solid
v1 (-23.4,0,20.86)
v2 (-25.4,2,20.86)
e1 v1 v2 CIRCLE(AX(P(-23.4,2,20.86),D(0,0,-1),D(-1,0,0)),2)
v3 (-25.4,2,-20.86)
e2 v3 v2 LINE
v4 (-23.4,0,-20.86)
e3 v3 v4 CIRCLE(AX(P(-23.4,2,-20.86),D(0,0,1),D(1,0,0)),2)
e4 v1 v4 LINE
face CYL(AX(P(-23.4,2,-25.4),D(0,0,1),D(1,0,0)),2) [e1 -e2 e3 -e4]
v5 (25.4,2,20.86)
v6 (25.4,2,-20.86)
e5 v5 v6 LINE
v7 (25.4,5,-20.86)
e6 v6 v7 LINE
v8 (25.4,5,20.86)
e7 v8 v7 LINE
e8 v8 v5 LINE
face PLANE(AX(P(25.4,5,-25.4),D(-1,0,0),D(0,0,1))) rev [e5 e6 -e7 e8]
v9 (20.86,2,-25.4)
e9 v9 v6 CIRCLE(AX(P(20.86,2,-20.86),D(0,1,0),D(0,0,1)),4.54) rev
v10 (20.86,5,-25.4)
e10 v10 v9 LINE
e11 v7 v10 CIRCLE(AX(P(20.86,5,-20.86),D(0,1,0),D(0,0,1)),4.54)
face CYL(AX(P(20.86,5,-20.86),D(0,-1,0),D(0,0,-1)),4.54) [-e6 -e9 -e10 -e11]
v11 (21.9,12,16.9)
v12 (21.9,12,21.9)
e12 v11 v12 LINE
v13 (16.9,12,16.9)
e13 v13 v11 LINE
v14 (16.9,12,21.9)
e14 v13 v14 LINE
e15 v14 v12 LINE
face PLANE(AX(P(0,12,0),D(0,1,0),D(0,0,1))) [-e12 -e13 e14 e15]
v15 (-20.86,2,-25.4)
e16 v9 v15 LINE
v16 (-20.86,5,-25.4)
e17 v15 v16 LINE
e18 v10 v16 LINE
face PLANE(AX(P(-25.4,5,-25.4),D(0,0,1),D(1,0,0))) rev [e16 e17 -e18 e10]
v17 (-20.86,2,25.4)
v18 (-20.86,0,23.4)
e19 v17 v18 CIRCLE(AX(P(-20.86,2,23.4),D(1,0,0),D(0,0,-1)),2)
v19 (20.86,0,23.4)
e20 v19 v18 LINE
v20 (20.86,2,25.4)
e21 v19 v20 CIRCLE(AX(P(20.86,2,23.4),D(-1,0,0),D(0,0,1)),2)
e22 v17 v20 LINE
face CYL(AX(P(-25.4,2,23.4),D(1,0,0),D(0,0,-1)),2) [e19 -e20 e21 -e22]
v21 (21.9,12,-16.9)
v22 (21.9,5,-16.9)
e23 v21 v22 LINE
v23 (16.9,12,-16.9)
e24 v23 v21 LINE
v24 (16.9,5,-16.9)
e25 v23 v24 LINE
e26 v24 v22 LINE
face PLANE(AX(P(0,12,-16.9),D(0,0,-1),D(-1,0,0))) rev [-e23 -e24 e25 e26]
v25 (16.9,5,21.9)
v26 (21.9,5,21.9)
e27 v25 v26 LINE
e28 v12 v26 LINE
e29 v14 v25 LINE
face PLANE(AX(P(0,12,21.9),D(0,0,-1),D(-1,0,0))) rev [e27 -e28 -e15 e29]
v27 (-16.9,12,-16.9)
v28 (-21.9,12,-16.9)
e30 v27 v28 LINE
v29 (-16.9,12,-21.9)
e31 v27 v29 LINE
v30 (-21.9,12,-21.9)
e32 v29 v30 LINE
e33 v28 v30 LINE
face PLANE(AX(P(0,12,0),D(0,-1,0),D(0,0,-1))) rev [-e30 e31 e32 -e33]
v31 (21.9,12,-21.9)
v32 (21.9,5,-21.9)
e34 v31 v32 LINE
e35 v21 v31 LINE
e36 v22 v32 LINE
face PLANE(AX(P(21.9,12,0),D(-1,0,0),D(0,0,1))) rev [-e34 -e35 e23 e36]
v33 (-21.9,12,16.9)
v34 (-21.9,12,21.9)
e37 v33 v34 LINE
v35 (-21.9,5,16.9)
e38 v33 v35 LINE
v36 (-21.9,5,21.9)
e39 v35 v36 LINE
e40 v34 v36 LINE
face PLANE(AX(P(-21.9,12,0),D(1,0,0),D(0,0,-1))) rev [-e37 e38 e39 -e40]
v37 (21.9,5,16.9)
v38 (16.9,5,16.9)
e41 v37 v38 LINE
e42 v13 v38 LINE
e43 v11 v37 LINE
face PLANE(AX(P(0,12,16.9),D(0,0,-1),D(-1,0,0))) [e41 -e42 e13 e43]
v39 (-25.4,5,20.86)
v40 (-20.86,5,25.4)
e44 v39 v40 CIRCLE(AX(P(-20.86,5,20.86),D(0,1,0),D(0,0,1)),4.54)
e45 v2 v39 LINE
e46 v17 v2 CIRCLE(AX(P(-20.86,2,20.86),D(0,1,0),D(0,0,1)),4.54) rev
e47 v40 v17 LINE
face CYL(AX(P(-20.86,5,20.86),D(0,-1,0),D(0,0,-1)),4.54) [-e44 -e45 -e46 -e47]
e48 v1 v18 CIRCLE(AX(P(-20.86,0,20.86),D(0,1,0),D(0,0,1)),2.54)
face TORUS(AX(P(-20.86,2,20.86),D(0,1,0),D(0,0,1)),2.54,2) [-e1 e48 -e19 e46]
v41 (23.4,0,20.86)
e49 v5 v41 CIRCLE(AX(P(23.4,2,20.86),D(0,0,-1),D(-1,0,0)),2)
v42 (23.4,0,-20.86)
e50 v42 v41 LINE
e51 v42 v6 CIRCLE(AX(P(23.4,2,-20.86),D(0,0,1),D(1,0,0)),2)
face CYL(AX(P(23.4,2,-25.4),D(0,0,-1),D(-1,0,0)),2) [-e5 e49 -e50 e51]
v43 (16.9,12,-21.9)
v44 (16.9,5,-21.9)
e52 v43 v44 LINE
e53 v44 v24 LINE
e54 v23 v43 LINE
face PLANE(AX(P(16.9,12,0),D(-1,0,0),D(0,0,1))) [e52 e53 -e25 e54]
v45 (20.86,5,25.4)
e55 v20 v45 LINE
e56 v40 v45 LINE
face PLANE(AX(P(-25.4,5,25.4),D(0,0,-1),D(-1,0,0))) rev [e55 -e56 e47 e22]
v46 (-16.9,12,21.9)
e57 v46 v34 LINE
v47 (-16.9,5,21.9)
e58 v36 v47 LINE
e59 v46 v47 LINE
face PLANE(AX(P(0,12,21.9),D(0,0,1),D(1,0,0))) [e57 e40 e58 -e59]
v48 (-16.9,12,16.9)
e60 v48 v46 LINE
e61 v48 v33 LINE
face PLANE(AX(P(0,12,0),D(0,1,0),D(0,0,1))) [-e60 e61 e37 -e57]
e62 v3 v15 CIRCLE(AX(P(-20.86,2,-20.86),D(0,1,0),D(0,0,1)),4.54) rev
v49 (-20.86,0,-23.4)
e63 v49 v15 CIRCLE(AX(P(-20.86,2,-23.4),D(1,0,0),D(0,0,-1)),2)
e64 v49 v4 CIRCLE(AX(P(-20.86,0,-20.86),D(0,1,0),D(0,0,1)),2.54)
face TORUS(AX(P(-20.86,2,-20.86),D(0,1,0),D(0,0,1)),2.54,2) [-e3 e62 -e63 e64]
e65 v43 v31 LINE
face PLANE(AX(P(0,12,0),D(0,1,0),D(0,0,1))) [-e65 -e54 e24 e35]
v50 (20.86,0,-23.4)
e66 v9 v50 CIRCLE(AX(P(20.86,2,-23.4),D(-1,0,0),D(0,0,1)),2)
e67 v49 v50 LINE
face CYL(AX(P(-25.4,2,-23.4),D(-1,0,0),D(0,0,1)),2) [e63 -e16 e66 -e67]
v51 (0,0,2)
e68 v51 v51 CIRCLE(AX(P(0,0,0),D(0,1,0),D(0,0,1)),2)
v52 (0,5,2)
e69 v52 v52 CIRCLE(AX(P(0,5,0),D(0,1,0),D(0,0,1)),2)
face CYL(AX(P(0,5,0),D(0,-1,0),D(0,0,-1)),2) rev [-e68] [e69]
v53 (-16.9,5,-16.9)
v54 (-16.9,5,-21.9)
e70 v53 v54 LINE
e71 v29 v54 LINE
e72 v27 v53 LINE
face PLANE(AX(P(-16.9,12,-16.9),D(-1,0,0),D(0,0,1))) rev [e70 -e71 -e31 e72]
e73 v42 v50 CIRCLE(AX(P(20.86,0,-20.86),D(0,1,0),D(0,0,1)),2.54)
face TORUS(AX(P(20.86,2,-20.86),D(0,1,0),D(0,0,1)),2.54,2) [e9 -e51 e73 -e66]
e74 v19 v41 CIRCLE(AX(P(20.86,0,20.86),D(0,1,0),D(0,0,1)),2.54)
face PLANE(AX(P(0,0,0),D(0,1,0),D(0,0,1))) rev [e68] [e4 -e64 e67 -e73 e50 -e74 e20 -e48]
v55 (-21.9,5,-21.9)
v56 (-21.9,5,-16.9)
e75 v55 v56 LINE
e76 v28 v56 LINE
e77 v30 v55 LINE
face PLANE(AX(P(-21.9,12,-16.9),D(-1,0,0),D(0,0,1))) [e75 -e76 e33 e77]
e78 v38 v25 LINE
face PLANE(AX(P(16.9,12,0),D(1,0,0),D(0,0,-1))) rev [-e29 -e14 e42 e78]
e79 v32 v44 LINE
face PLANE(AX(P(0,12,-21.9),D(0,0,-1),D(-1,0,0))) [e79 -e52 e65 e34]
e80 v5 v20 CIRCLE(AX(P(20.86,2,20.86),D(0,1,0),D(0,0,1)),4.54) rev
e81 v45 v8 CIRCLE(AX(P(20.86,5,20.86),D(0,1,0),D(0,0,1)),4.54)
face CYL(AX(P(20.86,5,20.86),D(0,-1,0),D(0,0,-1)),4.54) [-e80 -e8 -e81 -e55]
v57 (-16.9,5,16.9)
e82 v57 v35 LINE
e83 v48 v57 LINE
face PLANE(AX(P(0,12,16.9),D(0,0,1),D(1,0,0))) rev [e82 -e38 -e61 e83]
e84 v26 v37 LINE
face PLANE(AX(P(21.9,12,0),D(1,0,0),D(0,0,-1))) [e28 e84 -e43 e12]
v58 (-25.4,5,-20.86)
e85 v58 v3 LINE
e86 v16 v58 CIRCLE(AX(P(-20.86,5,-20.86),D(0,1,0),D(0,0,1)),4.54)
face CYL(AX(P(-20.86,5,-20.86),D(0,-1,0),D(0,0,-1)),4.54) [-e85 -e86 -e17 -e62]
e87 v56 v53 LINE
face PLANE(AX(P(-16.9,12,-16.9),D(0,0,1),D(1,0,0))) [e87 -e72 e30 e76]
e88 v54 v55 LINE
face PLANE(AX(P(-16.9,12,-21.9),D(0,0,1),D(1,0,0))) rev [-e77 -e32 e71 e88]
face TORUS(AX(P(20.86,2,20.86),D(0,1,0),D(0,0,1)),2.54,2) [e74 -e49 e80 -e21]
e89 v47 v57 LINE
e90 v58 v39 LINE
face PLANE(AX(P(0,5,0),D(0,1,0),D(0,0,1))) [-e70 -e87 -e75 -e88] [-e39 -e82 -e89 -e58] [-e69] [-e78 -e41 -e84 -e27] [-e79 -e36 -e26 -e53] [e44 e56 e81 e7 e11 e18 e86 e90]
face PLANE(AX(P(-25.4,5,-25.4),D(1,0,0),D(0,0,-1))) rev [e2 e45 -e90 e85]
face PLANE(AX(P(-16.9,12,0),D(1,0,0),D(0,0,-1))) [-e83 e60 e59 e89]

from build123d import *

# Parameters (mm, degrees)
SKETCH1_W           = 50.8
SKETCH1_H           = 50.8
SKETCH1_R           = 2
SKETCH1_W_2         = 5
SKETCH1_H_2         = 5
BOSS_EXTRUDE1_DEPTH = 5
FILLET1_R           = 2
FILLET2_R           = 4.54
SKETCH1_6_W         = 5
SKETCH1_6_H         = 5
BOSS_EXTRUDE2_DEPTH = 12


with BuildPart() as part:
    # Sketch1 → Boss-Extrude1 (new body)
    with BuildSketch(Plane(origin=(0, 0, 0), x_dir=(1, 0, 0), z_dir=(0, 1, 0))):
        Rectangle(SKETCH1_W, SKETCH1_H)
        with Locations(Location((0, 0, 0), (0, 0, 270))):
            Circle(SKETCH1_R, mode=Mode.SUBTRACT)
        with Locations((-19.4, 19.4)):
            Rectangle(SKETCH1_W_2, SKETCH1_H_2, mode=Mode.SUBTRACT)
        with Locations((19.4, 19.4)):
            Rectangle(SKETCH1_W_2, SKETCH1_H_2, mode=Mode.SUBTRACT)
        with Locations((-19.4, -19.4)):
            Rectangle(SKETCH1_W_2, SKETCH1_H_2, mode=Mode.SUBTRACT)
        with Locations((19.4, -19.4)):
            Rectangle(SKETCH1_W_2, SKETCH1_H_2, mode=Mode.SUBTRACT)
    extrude(amount=BOSS_EXTRUDE1_DEPTH)

    # Fillet1
    fillet1_edges = [part.edges().sort_by_distance(p)[0] for p in [
        (0, 0, 25.4),
        (-25.4, 0, 0),
        (0, 0, -25.4),
        (25.4, 0, 0),
    ]]
    fillet(fillet1_edges, radius=FILLET1_R)

    # Fillet2
    # the kernel refuses this fillet: 4.54 mm, written as the material it takes off along each edge
    with BuildSketch(Plane(origin=(20.86, 0, -20.86), x_dir=(0, 0, -1), z_dir=(-1, 0, 0))) as fillet2_piece_1:
        with BuildLine():
            CenterArc((2.54, -2), 2, 0, 90)
            Line((4.54, -2), (4.54, 0))
            Line((4.54, 0), (2.54, 0))
        make_face()
    revolve(axis=Axis((20.86, 0, -20.86), (0, -1, 0)), revolution_arc=90, mode=Mode.SUBTRACT)
    with BuildSketch(Plane(origin=(20.86, 0, 20.86), x_dir=(1, 0, 0), z_dir=(0, 0, -1))) as fillet2_piece_2:
        with BuildLine():
            CenterArc((2.54, -2), 2, 0, 90)
            Line((4.54, -2), (4.54, 0))
            Line((4.54, 0), (2.54, 0))
        make_face()
    revolve(axis=Axis((20.86, 0, 20.86), (0, -1, 0)), revolution_arc=90, mode=Mode.SUBTRACT)
    with BuildSketch(Plane(origin=(-20.86, 0, -20.86), x_dir=(-1, 0, 0), z_dir=(0, 0, 1))) as fillet2_piece_3:
        with BuildLine():
            CenterArc((2.54, -2), 2, 0, 90)
            Line((4.54, -2), (4.54, 0))
            Line((4.54, 0), (2.54, 0))
        make_face()
    revolve(axis=Axis((-20.86, 0, -20.86), (0, -1, 0)), revolution_arc=90, mode=Mode.SUBTRACT)
    with BuildSketch(Plane(origin=(-20.86, 0, 20.86), x_dir=(0, 0, 1), z_dir=(1, 0, 0))) as fillet2_piece_4:
        with BuildLine():
            CenterArc((2.54, -2), 2, 0, 90)
            Line((4.54, -2), (4.54, 0))
            Line((4.54, 0), (2.54, 0))
        make_face()
    revolve(axis=Axis((-20.86, 0, 20.86), (0, -1, 0)), revolution_arc=90, mode=Mode.SUBTRACT)
    with BuildSketch(Plane(origin=(25.4, 0, 25.4), x_dir=(0, 0, -1), z_dir=(0, 1, 0)), Plane(origin=(25.4, 0, -25.4), x_dir=(-1, 0, 0), z_dir=(0, 1, 0))) as fillet2_piece_5:
        with BuildLine():
            CenterArc((FILLET2_R, FILLET2_R), FILLET2_R, 180, 90)
            Line((0, FILLET2_R), (0, 0))
            Line((0, 0), (FILLET2_R, 0))
        make_face()
    extrude(amount=16.35, mode=Mode.SUBTRACT)
    with BuildSketch(Plane(origin=(-25.4, 0, 25.4), x_dir=(0, 0, -1), z_dir=(0, 1, 0)), Plane(origin=(-25.4, 0, -25.4), x_dir=(1, 0, 0), z_dir=(0, 1, 0))) as fillet2_piece_6:
        with BuildLine():
            CenterArc((FILLET2_R, -FILLET2_R), FILLET2_R, 90, 90)
            Line((0, -FILLET2_R), (0, 0))
            Line((0, 0), (FILLET2_R, 0))
        make_face()
    extrude(amount=16.35, mode=Mode.SUBTRACT)

    # Sketch1<6> → Boss-Extrude2 (add)
    with BuildSketch(Plane(origin=(0, 0, 0), x_dir=(1, 0, 0), z_dir=(0, 1, 0))):
        with Locations((-19.4, -19.4)):
            Rectangle(SKETCH1_6_W, SKETCH1_6_H)
        with Locations((19.4, -19.4)):
            Rectangle(SKETCH1_6_W, SKETCH1_6_H)
        with Locations((19.4, 19.4)):
            Rectangle(SKETCH1_6_W, SKETCH1_6_H)
        with Locations((-19.4, 19.4)):
            Rectangle(SKETCH1_6_W, SKETCH1_6_H)
    extrude(amount=BOSS_EXTRUDE2_DEPTH)


solid = part.part
